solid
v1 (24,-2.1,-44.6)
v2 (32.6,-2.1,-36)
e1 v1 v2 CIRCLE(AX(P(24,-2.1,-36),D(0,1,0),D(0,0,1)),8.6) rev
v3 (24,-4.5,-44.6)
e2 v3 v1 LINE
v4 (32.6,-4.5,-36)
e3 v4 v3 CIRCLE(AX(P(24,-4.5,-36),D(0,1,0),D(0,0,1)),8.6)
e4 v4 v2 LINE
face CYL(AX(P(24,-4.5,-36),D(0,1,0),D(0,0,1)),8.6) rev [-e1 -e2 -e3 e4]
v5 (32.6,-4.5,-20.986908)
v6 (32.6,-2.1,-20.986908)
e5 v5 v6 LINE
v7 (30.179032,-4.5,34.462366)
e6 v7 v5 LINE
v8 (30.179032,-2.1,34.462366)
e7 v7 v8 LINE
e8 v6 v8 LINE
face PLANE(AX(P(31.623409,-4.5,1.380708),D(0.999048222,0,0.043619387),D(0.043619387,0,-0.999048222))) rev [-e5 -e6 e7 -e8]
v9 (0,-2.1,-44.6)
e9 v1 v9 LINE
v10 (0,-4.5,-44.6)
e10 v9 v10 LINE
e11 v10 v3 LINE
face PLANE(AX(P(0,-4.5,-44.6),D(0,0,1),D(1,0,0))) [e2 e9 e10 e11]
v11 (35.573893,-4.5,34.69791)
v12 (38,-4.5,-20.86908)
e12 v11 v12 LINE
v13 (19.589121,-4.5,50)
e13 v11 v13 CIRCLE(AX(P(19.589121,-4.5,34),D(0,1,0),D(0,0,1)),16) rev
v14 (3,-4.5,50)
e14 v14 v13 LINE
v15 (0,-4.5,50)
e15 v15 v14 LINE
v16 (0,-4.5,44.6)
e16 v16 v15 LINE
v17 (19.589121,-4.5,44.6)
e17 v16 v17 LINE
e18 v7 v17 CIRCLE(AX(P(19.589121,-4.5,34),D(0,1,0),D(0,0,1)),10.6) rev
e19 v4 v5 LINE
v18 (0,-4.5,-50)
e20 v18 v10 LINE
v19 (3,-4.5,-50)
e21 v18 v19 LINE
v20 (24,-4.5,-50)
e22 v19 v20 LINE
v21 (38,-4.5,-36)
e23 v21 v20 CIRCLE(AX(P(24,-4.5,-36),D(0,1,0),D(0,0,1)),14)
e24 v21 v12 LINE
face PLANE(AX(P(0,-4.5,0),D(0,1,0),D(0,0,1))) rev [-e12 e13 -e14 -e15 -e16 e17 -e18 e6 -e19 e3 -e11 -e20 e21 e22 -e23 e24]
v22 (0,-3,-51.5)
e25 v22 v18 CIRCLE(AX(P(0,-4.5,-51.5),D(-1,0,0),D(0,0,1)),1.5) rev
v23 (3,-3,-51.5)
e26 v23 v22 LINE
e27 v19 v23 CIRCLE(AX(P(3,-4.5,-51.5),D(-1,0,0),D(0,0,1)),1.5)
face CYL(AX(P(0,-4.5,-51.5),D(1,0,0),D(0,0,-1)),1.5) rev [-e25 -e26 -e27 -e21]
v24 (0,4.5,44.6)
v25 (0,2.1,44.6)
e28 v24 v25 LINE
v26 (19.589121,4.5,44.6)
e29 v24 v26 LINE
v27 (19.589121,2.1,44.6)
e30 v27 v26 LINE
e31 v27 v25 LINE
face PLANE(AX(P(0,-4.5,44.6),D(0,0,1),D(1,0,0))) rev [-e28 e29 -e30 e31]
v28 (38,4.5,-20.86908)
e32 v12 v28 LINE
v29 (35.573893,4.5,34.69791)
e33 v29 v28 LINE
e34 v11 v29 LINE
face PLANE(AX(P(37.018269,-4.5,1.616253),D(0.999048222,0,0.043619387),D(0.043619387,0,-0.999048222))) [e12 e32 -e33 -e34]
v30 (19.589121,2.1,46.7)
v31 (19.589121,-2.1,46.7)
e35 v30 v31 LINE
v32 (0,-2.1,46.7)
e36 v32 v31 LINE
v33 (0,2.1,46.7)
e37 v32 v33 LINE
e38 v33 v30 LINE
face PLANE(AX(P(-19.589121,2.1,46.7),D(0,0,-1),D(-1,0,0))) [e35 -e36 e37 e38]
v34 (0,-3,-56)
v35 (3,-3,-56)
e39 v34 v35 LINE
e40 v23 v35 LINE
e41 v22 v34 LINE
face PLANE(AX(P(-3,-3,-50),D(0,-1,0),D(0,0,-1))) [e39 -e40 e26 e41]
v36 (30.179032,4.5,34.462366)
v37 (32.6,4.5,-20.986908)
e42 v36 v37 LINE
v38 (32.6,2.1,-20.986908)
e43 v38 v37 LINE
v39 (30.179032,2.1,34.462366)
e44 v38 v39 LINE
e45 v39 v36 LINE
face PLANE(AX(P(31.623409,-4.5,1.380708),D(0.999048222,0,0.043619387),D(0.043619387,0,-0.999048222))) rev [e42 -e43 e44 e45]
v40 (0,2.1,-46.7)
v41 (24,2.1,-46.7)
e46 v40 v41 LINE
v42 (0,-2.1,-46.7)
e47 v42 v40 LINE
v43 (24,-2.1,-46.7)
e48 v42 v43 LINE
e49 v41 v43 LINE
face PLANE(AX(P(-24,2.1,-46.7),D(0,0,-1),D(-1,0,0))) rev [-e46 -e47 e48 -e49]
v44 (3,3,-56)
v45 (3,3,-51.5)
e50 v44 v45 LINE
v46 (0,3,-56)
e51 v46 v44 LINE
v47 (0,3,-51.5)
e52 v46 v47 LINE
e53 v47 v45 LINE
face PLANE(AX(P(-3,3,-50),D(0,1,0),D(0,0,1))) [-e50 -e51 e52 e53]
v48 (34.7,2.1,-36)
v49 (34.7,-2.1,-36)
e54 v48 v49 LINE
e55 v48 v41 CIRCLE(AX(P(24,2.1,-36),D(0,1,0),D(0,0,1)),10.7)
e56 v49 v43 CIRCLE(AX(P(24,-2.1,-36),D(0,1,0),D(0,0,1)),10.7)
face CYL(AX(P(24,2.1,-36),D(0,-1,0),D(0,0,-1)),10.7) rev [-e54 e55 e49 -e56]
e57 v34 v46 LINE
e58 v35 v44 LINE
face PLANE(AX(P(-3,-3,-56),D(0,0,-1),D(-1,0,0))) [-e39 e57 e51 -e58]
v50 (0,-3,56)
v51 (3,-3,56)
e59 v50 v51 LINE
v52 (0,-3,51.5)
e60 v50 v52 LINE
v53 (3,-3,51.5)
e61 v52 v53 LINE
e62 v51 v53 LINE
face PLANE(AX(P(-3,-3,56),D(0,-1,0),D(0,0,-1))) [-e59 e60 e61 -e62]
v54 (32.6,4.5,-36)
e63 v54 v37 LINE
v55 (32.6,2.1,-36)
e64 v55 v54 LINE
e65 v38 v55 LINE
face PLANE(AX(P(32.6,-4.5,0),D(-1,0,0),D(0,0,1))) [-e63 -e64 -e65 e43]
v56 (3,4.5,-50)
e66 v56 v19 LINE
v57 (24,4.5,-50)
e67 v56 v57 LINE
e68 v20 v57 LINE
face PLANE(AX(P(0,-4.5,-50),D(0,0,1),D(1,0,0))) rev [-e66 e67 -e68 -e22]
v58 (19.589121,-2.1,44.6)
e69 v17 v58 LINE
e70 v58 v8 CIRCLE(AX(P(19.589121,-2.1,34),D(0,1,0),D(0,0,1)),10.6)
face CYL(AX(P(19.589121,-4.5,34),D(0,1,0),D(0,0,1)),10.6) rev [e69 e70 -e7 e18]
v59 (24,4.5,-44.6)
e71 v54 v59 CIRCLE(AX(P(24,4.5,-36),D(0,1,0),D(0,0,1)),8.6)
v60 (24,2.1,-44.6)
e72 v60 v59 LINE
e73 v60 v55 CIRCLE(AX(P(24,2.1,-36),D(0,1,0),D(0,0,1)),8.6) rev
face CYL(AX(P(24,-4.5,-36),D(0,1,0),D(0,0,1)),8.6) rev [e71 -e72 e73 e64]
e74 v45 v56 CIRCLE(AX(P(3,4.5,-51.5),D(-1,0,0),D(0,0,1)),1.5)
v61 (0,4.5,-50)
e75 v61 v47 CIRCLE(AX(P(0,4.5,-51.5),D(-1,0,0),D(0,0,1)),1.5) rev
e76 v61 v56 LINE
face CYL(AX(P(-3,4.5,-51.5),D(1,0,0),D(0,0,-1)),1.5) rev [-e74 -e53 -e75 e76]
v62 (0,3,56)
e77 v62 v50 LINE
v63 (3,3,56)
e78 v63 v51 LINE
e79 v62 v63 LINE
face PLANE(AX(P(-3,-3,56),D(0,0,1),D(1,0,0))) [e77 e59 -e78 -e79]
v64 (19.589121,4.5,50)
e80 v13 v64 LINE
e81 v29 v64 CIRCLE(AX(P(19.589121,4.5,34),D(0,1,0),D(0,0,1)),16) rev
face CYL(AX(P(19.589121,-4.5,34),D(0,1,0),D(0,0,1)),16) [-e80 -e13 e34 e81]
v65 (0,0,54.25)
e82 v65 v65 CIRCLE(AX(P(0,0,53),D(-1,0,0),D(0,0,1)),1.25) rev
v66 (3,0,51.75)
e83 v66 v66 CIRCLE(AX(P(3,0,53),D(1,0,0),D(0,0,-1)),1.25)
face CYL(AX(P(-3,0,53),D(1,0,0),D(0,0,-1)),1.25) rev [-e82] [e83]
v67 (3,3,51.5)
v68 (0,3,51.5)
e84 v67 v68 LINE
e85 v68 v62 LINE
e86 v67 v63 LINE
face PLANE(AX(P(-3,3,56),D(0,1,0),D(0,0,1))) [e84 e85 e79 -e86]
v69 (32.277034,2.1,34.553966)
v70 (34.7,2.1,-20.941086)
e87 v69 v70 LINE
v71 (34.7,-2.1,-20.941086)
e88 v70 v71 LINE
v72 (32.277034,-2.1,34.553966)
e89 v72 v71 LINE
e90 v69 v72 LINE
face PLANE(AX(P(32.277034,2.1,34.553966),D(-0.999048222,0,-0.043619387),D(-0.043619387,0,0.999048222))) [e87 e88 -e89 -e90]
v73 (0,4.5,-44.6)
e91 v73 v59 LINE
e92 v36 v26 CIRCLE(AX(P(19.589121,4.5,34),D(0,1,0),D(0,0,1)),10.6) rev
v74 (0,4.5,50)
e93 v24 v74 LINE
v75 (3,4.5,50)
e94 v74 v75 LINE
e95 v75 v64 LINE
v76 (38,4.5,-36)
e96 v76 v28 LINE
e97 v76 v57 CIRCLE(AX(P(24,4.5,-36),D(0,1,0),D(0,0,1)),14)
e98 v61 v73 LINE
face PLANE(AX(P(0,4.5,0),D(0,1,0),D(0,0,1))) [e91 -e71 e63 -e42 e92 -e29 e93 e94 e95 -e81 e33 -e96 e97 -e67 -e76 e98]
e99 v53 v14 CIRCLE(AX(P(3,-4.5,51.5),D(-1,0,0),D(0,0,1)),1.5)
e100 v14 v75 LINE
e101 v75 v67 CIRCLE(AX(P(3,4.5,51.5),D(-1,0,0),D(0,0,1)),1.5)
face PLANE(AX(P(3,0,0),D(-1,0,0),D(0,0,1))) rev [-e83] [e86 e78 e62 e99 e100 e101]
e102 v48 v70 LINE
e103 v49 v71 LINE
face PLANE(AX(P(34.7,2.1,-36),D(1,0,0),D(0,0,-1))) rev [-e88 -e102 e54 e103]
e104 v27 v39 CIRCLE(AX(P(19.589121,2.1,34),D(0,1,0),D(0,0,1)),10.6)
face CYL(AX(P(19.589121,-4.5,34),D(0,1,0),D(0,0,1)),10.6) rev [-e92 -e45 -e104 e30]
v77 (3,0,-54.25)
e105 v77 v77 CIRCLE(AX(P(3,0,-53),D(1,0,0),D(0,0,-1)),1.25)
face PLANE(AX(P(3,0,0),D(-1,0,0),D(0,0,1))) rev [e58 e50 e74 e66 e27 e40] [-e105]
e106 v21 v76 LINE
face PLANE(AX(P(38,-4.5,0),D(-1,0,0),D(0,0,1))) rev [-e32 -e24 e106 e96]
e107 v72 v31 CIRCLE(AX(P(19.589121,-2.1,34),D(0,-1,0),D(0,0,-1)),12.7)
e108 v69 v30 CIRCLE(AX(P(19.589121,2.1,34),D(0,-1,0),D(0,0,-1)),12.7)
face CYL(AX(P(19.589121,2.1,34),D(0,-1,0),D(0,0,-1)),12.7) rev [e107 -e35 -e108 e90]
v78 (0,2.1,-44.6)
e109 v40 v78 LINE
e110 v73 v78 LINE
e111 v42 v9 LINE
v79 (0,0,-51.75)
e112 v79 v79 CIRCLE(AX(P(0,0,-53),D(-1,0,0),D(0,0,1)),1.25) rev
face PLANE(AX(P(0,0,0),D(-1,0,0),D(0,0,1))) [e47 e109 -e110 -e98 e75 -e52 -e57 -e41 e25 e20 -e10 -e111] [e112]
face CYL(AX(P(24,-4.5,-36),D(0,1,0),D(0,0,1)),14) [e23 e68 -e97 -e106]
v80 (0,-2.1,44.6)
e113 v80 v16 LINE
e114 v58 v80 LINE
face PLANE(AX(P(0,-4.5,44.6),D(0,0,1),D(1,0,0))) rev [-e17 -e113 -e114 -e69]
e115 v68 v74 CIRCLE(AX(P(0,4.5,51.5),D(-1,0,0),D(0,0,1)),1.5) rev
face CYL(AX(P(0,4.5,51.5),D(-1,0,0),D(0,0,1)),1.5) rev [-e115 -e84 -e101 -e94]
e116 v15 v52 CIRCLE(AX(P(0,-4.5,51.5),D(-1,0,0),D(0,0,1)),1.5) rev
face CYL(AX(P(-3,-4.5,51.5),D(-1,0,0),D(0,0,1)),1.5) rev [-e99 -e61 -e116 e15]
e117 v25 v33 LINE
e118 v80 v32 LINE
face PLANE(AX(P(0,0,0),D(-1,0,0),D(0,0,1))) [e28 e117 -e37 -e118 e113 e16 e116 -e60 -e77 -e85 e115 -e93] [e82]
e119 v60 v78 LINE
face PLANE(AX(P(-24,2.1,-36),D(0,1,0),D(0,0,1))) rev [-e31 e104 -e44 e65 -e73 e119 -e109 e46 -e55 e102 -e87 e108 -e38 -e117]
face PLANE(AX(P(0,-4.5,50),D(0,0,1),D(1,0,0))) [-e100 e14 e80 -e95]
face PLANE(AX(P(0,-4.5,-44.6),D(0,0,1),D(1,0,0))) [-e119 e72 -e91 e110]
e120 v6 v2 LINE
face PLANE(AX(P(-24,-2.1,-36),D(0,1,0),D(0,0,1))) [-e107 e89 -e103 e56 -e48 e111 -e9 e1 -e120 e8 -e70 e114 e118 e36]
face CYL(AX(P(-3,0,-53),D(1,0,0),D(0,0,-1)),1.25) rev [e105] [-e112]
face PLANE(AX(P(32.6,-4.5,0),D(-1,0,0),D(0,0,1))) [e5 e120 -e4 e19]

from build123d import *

# Parameters (mm, degrees)
BOSS_EXTRUDE1_DEPTH      = 4.5
BOSS_EXTRUDE1_DEPTH_BACK = 4.5
CUT_EXTRUDE1_DEPTH       = 2.1
CUT_EXTRUDE1_DEPTH_BACK  = 2.1
BOSS_EXTRUDE2_DEPTH      = 3
BOSS_EXTRUDE2_DEPTH_BACK = 3
SKETCH2_W                = 6
SKETCH2_H                = 6
SKETCH2_R                = 1.25
FILLET2_R                = 1.5
SKETCH5_W                = 120
SKETCH5_H                = 30
CUT_EXTRUDE2_DEPTH       = 68.825142831


with BuildPart() as part:
    # Sketch1 → Boss-Extrude1 (new, two sides: drawn at the far end of the back side and taken through both)
    # profile 1 of 2: a face of its own
    with BuildSketch(Plane(origin=(0, 0, 0), x_dir=(1, 0, 0), z_dir=(0, 1, 0)).offset(-BOSS_EXTRUDE1_DEPTH_BACK)):
        with BuildLine():
            Line((-24, 50), (24, 50))
            ThreePointArc((24, 50), (33.899494937, 45.899494937), (38, 36))
            Line((38, 36), (38, 20.869079534))
            Line((38, 20.869079534), (35.573892834, -34.697910198))
            ThreePointArc((35.573892834, -34.697910198), (30.653330181, -45.557823393), (19.589121288, -50))
            Line((19.589121288, -50), (-19.589121288, -50))
            ThreePointArc((-19.589121288, -50), (-30.653330181, -45.557823393), (-35.573892834, -34.697910198))
            Line((-35.573892834, -34.697910198), (-38, 20.869079534))
            Line((-38, 20.869079534), (-38, 36))
            ThreePointArc((-38, 36), (-33.899494937, 45.899494937), (-24, 50))
        make_face()
        with BuildLine():
            ThreePointArc((-24, 46.7), (-31.566042559, 43.566042559), (-34.7, 36))
            Line((-34.7, 36), (-34.7, 20.94108579))
            Line((-34.7, 20.94108579), (-32.277033702, -34.55396622))
            ThreePointArc((-32.277033702, -34.55396622), (-28.371337097, -43.174022318), (-19.589121288, -46.7))
            Line((-19.589121288, -46.7), (19.589121288, -46.7))
            ThreePointArc((19.589121288, -46.7), (28.371337097, -43.174022318), (32.277033702, -34.55396622))
            Line((32.277033702, -34.55396622), (34.7, 20.94108579))
            Line((34.7, 20.94108579), (34.7, 36))
            ThreePointArc((34.7, 36), (31.566042559, 43.566042559), (24, 46.7))
            Line((24, 46.7), (-24, 46.7))
        make_face(mode=Mode.SUBTRACT)
    # profile 2 of 2: a face of its own
    with BuildSketch(Plane(origin=(0, 0, 0), x_dir=(1, 0, 0), z_dir=(0, 1, 0)).offset(-BOSS_EXTRUDE1_DEPTH_BACK)):
        with BuildLine():
            Line((-24, 46.7), (24, 46.7))
            ThreePointArc((24, 46.7), (31.566042559, 43.566042559), (34.7, 36))
            Line((34.7, 36), (34.7, 20.94108579))
            Line((34.7, 20.94108579), (32.277033702, -34.55396622))
            ThreePointArc((32.277033702, -34.55396622), (28.371337097, -43.174022318), (19.589121288, -46.7))
            Line((19.589121288, -46.7), (-19.589121288, -46.7))
            ThreePointArc((-19.589121288, -46.7), (-28.371337097, -43.174022318), (-32.277033702, -34.55396622))
            Line((-32.277033702, -34.55396622), (-34.7, 20.94108579))
            Line((-34.7, 20.94108579), (-34.7, 36))
            ThreePointArc((-34.7, 36), (-31.566042559, 43.566042559), (-24, 46.7))
        make_face()
        with BuildLine():
            ThreePointArc((-24, 44.6), (-30.081118318, 42.081118318), (-32.6, 36))
            Line((-32.6, 36), (-32.6, 20.986907953))
            Line((-32.6, 20.986907953), (-30.179032437, -34.462365506))
            ThreePointArc((-30.179032437, -34.462365506), (-26.91915968, -41.657057998), (-19.589121288, -44.6))
            Line((-19.589121288, -44.6), (19.589121288, -44.6))
            ThreePointArc((19.589121288, -44.6), (26.91915968, -41.657057998), (30.179032437, -34.462365506))
            Line((30.179032437, -34.462365506), (32.6, 20.986907953))
            Line((32.6, 20.986907953), (32.6, 36))
            ThreePointArc((32.6, 36), (30.081118318, 42.081118318), (24, 44.6))
            Line((24, 44.6), (-24, 44.6))
        make_face(mode=Mode.SUBTRACT)
    extrude(amount=BOSS_EXTRUDE1_DEPTH + BOSS_EXTRUDE1_DEPTH_BACK)

    # Sketch1<3> → Cut-Extrude1 (cut, two sides: drawn at the far end of the back side and taken through both)
    with BuildSketch(Plane(origin=(0, 0, 0), x_dir=(1, 0, 0), z_dir=(0, 1, 0)).offset(-CUT_EXTRUDE1_DEPTH_BACK)):
        with BuildLine():
            Line((-24, 46.7), (24, 46.7))
            ThreePointArc((24, 46.7), (31.566042559, 43.566042559), (34.7, 36))
            Line((34.7, 36), (34.7, 20.94108579))
            Line((34.7, 20.94108579), (32.277033702, -34.55396622))
            ThreePointArc((32.277033702, -34.55396622), (28.371337097, -43.174022318), (19.589121288, -46.7))
            Line((19.589121288, -46.7), (-19.589121288, -46.7))
            ThreePointArc((-19.589121288, -46.7), (-28.371337097, -43.174022318), (-32.277033702, -34.55396622))
            Line((-32.277033702, -34.55396622), (-34.7, 20.94108579))
            Line((-34.7, 20.94108579), (-34.7, 36))
            ThreePointArc((-34.7, 36), (-31.566042559, 43.566042559), (-24, 46.7))
        make_face()
        with BuildLine():
            Line((-32, 36), (-32, 21))
            Line((-32, 21), (-29.579603504, -34.436193874))
            ThreePointArc((-29.579603504, -34.436193874), (-26.504251846, -41.223639621), (-19.589121288, -44))
            Line((-19.589121288, -44), (19.589121288, -44))
            ThreePointArc((19.589121288, -44), (26.504251846, -41.223639621), (29.579603504, -34.436193874))
            Line((29.579603504, -34.436193874), (32, 21))
            Line((32, 21), (32, 36))
            ThreePointArc((32, 36), (29.656854249, 41.656854249), (24, 44))
            Line((24, 44), (-24, 44))
            ThreePointArc((-24, 44), (-29.656854249, 41.656854249), (-32, 36))
        make_face(mode=Mode.SUBTRACT)
    extrude(amount=CUT_EXTRUDE1_DEPTH + CUT_EXTRUDE1_DEPTH_BACK, mode=Mode.SUBTRACT)

    # Sketch2 → Boss-Extrude2 (add, two sides: drawn at the far end of the back side and taken through both)
    # profile 1 of 2: a face of its own
    with BuildSketch(Plane(origin=(0, 0, 0), x_dir=(0, 0, -1), z_dir=(1, 0, 0)).offset(-BOSS_EXTRUDE2_DEPTH_BACK)):
        with Locations((-53, 0)):
            Rectangle(SKETCH2_W, SKETCH2_H)
        with Locations((-53, 0)):
            Circle(SKETCH2_R, mode=Mode.SUBTRACT)
    # profile 2 of 2: a face of its own
    with BuildSketch(Plane(origin=(0, 0, 0), x_dir=(0, 0, -1), z_dir=(1, 0, 0)).offset(-BOSS_EXTRUDE2_DEPTH_BACK)):
        with Locations((53, 0)):
            Rectangle(SKETCH2_W, SKETCH2_H)
        with Locations((53, 0)):
            Circle(SKETCH2_R, mode=Mode.SUBTRACT)
    extrude(amount=BOSS_EXTRUDE2_DEPTH + BOSS_EXTRUDE2_DEPTH_BACK)

    # Fillet2
    fillet2_edges = [part.edges().sort_by_distance(p)[0] for p in [
        (0, 3, 50),
        (0, -3, 50),
        (0, -3, -50),
        (0, 3, -50),
    ]]
    fillet(fillet2_edges, radius=FILLET2_R - 0.0001)  # a hair under: the kernel refuses the full size

    # Sketch5 → Cut-Extrude2 (cut, through all)
    with BuildSketch(Plane(origin=(0, 0, 0), x_dir=(0, 0, -1), z_dir=(1, 0, 0))):
        Rectangle(SKETCH5_W, SKETCH5_H)
    extrude(amount=-CUT_EXTRUDE2_DEPTH, mode=Mode.SUBTRACT)


solid = part.part
